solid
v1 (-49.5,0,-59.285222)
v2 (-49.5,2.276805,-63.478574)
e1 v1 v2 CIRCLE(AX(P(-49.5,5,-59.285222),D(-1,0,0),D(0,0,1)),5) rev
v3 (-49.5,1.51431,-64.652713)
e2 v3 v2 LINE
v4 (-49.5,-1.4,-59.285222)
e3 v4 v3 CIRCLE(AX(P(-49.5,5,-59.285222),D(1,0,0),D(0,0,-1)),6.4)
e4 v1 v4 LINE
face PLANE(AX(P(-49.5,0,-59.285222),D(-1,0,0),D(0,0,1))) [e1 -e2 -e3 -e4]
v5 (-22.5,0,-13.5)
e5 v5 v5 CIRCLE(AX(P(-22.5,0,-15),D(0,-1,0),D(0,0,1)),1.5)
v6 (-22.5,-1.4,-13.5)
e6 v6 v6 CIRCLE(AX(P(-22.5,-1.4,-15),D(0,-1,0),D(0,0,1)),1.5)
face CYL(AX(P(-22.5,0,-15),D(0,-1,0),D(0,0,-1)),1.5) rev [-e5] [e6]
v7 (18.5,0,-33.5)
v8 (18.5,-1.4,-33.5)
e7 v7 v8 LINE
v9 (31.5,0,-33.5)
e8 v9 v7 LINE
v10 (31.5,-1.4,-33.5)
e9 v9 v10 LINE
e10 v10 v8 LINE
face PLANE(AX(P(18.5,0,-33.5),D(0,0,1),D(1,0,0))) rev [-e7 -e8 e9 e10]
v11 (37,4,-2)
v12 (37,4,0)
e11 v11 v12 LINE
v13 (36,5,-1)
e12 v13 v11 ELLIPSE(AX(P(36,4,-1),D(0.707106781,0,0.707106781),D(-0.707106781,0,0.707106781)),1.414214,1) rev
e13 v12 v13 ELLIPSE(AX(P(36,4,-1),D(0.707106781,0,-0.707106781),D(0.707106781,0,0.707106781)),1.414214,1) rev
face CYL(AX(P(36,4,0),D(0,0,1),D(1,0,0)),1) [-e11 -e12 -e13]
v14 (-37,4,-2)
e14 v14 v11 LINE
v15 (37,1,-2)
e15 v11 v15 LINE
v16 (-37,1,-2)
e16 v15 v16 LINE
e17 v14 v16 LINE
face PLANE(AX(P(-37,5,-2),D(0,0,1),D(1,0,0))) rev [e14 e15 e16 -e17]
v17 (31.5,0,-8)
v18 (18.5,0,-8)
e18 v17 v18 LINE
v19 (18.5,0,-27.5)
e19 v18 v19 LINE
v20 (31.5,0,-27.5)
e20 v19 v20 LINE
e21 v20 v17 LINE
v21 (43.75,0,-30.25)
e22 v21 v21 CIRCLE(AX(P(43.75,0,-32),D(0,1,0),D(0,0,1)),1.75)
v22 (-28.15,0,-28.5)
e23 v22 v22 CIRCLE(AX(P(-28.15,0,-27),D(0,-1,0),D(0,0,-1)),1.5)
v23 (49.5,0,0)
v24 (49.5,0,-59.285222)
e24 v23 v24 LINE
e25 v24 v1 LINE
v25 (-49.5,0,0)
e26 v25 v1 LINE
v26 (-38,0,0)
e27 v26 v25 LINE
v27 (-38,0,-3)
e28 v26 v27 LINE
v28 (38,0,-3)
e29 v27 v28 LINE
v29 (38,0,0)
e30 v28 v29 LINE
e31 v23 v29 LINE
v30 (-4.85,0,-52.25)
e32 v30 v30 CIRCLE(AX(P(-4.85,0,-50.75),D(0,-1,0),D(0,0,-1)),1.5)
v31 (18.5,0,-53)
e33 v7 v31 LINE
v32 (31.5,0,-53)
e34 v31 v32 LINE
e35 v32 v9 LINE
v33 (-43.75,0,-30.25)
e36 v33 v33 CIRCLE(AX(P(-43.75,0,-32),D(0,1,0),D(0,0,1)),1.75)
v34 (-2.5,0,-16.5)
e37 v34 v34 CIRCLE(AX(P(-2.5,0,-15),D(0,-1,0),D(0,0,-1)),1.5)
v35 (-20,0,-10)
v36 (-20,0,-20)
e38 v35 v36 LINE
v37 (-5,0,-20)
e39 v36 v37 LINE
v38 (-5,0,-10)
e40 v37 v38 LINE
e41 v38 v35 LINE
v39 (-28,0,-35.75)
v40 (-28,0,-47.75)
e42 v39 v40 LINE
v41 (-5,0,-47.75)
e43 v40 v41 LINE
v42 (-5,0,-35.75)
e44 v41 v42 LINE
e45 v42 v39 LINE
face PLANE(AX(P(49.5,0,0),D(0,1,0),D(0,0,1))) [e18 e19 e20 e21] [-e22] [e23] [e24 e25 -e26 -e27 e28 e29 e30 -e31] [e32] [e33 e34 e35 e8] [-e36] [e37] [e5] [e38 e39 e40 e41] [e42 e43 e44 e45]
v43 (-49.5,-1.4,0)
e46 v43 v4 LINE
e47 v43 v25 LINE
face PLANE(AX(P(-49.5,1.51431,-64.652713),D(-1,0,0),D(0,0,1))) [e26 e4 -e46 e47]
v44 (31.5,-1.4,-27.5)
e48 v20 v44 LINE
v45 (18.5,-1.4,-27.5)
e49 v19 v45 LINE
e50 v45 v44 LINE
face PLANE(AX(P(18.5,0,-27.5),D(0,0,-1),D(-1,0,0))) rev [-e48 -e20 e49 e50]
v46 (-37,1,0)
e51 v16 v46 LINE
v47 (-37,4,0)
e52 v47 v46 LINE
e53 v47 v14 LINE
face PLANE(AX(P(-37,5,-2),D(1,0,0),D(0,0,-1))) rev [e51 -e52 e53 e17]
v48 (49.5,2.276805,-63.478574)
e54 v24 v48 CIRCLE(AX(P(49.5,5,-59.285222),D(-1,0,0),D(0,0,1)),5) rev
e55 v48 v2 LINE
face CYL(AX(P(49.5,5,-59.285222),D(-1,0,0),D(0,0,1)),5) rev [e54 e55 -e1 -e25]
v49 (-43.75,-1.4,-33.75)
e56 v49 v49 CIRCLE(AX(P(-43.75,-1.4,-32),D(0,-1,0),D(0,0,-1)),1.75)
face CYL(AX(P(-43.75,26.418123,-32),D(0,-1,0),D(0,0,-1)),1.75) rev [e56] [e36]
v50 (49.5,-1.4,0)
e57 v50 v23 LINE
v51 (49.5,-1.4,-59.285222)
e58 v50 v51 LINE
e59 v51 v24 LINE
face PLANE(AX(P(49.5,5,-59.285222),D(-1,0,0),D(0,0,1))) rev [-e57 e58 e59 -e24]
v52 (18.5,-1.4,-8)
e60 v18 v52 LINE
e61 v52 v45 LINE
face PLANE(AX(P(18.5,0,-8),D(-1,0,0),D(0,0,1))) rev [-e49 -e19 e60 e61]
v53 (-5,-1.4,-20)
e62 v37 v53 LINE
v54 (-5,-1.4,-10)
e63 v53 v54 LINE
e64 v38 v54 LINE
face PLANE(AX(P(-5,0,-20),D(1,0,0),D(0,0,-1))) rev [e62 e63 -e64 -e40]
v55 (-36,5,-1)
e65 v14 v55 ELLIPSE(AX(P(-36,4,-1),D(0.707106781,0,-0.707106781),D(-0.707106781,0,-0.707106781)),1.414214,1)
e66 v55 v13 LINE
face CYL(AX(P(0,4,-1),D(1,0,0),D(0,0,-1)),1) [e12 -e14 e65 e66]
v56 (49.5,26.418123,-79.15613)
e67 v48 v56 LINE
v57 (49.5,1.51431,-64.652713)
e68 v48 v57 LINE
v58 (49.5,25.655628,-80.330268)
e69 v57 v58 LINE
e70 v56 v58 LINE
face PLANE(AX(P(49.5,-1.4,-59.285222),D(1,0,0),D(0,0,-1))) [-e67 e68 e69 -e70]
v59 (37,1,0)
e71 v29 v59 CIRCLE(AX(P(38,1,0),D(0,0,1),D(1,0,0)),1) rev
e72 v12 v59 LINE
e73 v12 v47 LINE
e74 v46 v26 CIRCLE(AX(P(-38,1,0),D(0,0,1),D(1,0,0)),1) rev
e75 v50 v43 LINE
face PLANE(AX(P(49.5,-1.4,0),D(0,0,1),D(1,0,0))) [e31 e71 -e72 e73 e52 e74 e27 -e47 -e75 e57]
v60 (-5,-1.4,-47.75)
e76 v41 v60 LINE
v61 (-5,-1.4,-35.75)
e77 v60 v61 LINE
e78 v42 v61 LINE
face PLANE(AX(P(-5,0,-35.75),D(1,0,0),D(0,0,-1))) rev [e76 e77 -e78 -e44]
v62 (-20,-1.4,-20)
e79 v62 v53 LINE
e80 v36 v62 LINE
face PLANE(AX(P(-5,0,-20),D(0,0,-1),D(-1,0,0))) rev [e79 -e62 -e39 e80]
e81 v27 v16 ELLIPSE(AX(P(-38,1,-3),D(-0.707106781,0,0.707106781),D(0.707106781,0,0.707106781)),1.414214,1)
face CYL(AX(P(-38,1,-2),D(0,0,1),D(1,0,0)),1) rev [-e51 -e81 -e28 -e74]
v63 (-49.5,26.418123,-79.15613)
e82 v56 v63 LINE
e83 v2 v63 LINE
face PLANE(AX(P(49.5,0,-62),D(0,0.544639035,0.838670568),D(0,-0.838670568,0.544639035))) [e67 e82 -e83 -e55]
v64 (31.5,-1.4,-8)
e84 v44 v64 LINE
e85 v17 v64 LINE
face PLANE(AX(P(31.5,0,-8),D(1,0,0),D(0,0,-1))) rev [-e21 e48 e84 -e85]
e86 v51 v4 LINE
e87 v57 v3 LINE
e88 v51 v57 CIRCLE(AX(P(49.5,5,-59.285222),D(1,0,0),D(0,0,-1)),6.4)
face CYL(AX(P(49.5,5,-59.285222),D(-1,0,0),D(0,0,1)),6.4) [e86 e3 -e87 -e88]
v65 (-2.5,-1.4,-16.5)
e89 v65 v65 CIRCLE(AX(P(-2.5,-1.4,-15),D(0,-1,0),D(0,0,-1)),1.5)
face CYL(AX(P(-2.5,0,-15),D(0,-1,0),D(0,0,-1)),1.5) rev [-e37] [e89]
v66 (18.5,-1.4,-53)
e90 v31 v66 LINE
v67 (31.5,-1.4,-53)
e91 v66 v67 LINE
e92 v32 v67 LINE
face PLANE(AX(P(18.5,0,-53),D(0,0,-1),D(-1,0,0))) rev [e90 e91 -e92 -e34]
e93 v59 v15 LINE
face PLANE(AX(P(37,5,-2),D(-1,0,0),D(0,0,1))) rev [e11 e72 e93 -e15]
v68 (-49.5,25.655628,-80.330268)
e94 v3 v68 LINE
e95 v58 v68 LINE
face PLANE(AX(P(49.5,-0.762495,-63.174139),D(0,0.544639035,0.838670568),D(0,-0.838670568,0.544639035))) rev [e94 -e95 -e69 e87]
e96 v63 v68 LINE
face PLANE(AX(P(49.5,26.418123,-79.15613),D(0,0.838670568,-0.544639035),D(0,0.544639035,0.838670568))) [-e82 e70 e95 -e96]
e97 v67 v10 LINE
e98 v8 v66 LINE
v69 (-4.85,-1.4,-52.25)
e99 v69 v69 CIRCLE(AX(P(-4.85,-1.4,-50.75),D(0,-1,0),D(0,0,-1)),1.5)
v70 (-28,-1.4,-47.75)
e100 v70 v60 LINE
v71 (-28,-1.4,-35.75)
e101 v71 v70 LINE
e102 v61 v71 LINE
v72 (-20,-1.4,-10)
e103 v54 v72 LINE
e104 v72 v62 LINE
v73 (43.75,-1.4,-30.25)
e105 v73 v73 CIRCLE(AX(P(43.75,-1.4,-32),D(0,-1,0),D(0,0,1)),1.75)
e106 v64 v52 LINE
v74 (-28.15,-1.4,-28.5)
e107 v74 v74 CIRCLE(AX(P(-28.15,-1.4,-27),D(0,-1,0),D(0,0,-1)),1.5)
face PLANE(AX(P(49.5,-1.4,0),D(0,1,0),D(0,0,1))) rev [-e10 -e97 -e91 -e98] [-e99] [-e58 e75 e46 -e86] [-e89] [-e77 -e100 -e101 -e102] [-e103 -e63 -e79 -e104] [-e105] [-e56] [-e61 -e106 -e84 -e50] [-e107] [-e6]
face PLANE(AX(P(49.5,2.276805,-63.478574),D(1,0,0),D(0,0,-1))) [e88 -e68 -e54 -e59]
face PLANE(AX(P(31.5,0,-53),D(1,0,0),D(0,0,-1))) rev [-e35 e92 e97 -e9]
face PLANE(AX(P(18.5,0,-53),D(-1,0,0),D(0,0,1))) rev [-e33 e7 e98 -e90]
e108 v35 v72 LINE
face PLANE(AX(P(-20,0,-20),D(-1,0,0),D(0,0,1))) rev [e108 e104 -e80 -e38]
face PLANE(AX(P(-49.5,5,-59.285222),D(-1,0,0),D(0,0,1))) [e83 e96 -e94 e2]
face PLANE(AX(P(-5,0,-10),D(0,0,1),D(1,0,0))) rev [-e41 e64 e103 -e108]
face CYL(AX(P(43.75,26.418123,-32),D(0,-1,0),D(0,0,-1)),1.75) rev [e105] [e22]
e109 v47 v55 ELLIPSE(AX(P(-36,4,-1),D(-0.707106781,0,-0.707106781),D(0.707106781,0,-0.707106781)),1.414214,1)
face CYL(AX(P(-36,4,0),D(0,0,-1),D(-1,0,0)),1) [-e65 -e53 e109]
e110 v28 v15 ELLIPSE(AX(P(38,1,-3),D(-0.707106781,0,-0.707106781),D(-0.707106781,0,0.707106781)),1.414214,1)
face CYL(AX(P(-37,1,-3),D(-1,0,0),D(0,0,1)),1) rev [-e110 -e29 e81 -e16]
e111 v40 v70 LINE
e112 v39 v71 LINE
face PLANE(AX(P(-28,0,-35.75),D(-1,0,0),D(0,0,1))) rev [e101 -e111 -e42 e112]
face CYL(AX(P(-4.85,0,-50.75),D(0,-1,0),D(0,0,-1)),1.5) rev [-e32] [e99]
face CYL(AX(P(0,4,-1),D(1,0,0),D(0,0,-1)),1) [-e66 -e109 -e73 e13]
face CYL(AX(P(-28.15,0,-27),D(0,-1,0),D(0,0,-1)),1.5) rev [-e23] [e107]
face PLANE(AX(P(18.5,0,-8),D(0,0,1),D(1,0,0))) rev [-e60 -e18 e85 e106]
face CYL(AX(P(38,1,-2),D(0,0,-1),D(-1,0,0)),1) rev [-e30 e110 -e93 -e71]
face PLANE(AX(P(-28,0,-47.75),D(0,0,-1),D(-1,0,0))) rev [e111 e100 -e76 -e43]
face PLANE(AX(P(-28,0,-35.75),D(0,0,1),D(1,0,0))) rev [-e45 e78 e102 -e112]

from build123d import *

# Parameters (mm, degrees)
T_LE_DE_BASE_PLI_E1_DEPTH = 49.5
ESQUISSE6_R               = 1.75
ENL_V_MAT_EXTRU_1_DEPTH   = 99.371997957
ESQUISSE7_R               = 1.5
ESQUISSE7_W               = 13
ESQUISSE7_H               = 19.5
ESQUISSE7_W_2             = 23
ESQUISSE7_H_2             = 12
ESQUISSE7_W_3             = 15
ESQUISSE7_H_3             = 10
ENL_V_MAT_EXTRU_2_DEPTH   = 1.4
ESQUISSE11_W              = 74
ESQUISSE11_H              = 2
BOSS_EXTRU_2_DEPTH        = 5
CONG_1_R                  = 1


# Sheet-metal steps are written as plain solids
with BuildPart() as part:
    # Esquisse1 → Tôle de base pliée1 (new, symmetric)
    with BuildSketch(Plane(origin=(0, 0, 0), x_dir=(0, 0, -1), z_dir=(1, 0, 0))):
        with BuildLine():
            Line((0, 0), (59.285221502, 0))
            ThreePointArc((59.285221502, 0), (61.671015303, 0.605914437), (63.478574342, 2.276804825))
            Line((63.478574342, 2.276804825), (79.156129603, 26.41812289))
            Line((79.156129603, 26.41812289), (80.330268398, 25.655628241))
            Line((80.330268398, 25.655628241), (64.652713137, 1.514310176))
            ThreePointArc((64.652713137, 1.514310176), (62.339037567, -0.624429521), (59.285221502, -1.4))
            Line((59.285221502, -1.4), (0, -1.4))
            Line((0, -1.4), (0, 0))
        make_face()
    extrude(amount=T_LE_DE_BASE_PLI_E1_DEPTH, both=True)

    # Esquisse6 → Enlèv. mat.-Extru.1 (cut, through all)
    with BuildSketch(Plane.XZ.offset(1.4)):
        with Locations(Location((-43.75, -32, 0), (0, 0, 270))):
            Circle(ESQUISSE6_R)
        with Locations(Location((43.75, -32, 0), (0, 0, 90))):
            Circle(ESQUISSE6_R)
    extrude(amount=-ENL_V_MAT_EXTRU_1_DEPTH, mode=Mode.SUBTRACT)

    # Esquisse7 → Enlèv. mat.-Extru.2 (cut)
    with BuildSketch(Plane.XZ.offset(1.4)):
        with Locations(Location((-28.15, -27, 0), (0, 0, 270))):
            Circle(ESQUISSE7_R)
        with Locations(Location((-4.85, -50.75, 0), (0, 0, 270))):
            Circle(ESQUISSE7_R)
        with Locations(Location((-2.5, -15, 0), (0, 0, 270))):
            Circle(ESQUISSE7_R)
        with Locations(Location((-22.5, -15, 0), (0, 0, 90))):
            Circle(ESQUISSE7_R)
        with Locations((25, -17.75)):
            Rectangle(ESQUISSE7_W, ESQUISSE7_H)
        with Locations((-16.5, -41.75)):
            Rectangle(ESQUISSE7_W_2, ESQUISSE7_H_2)
        with Locations((25, -43.25)):
            Rectangle(ESQUISSE7_W, ESQUISSE7_H)
        with Locations((-12.5, -15)):
            Rectangle(ESQUISSE7_W_3, ESQUISSE7_H_3)
    extrude(amount=-ENL_V_MAT_EXTRU_2_DEPTH, mode=Mode.SUBTRACT)

    # Esquisse11 → Boss.-Extru.2 (add)
    with BuildSketch(Plane(origin=(0, 0, 0), x_dir=(1, 0, 0), z_dir=(0, 1, 0))):
        with Locations((0, 1)):
            Rectangle(ESQUISSE11_W, ESQUISSE11_H)
    extrude(amount=BOSS_EXTRU_2_DEPTH)

    # Congé1
    cong_1_edges = [part.edges().sort_by_distance(p)[0] for p in [
        (-37, 0, -1),
        (37, 0, -1),
        (0, 0, -2),
        (-37, 5, -1),
        (0, 5, 0),
        (37, 5, -1),
        (0, 5, -2),
    ]]
    fillet(cong_1_edges, radius=CONG_1_R - 0.0001)  # a hair under: the kernel refuses the full size


solid = part.part
